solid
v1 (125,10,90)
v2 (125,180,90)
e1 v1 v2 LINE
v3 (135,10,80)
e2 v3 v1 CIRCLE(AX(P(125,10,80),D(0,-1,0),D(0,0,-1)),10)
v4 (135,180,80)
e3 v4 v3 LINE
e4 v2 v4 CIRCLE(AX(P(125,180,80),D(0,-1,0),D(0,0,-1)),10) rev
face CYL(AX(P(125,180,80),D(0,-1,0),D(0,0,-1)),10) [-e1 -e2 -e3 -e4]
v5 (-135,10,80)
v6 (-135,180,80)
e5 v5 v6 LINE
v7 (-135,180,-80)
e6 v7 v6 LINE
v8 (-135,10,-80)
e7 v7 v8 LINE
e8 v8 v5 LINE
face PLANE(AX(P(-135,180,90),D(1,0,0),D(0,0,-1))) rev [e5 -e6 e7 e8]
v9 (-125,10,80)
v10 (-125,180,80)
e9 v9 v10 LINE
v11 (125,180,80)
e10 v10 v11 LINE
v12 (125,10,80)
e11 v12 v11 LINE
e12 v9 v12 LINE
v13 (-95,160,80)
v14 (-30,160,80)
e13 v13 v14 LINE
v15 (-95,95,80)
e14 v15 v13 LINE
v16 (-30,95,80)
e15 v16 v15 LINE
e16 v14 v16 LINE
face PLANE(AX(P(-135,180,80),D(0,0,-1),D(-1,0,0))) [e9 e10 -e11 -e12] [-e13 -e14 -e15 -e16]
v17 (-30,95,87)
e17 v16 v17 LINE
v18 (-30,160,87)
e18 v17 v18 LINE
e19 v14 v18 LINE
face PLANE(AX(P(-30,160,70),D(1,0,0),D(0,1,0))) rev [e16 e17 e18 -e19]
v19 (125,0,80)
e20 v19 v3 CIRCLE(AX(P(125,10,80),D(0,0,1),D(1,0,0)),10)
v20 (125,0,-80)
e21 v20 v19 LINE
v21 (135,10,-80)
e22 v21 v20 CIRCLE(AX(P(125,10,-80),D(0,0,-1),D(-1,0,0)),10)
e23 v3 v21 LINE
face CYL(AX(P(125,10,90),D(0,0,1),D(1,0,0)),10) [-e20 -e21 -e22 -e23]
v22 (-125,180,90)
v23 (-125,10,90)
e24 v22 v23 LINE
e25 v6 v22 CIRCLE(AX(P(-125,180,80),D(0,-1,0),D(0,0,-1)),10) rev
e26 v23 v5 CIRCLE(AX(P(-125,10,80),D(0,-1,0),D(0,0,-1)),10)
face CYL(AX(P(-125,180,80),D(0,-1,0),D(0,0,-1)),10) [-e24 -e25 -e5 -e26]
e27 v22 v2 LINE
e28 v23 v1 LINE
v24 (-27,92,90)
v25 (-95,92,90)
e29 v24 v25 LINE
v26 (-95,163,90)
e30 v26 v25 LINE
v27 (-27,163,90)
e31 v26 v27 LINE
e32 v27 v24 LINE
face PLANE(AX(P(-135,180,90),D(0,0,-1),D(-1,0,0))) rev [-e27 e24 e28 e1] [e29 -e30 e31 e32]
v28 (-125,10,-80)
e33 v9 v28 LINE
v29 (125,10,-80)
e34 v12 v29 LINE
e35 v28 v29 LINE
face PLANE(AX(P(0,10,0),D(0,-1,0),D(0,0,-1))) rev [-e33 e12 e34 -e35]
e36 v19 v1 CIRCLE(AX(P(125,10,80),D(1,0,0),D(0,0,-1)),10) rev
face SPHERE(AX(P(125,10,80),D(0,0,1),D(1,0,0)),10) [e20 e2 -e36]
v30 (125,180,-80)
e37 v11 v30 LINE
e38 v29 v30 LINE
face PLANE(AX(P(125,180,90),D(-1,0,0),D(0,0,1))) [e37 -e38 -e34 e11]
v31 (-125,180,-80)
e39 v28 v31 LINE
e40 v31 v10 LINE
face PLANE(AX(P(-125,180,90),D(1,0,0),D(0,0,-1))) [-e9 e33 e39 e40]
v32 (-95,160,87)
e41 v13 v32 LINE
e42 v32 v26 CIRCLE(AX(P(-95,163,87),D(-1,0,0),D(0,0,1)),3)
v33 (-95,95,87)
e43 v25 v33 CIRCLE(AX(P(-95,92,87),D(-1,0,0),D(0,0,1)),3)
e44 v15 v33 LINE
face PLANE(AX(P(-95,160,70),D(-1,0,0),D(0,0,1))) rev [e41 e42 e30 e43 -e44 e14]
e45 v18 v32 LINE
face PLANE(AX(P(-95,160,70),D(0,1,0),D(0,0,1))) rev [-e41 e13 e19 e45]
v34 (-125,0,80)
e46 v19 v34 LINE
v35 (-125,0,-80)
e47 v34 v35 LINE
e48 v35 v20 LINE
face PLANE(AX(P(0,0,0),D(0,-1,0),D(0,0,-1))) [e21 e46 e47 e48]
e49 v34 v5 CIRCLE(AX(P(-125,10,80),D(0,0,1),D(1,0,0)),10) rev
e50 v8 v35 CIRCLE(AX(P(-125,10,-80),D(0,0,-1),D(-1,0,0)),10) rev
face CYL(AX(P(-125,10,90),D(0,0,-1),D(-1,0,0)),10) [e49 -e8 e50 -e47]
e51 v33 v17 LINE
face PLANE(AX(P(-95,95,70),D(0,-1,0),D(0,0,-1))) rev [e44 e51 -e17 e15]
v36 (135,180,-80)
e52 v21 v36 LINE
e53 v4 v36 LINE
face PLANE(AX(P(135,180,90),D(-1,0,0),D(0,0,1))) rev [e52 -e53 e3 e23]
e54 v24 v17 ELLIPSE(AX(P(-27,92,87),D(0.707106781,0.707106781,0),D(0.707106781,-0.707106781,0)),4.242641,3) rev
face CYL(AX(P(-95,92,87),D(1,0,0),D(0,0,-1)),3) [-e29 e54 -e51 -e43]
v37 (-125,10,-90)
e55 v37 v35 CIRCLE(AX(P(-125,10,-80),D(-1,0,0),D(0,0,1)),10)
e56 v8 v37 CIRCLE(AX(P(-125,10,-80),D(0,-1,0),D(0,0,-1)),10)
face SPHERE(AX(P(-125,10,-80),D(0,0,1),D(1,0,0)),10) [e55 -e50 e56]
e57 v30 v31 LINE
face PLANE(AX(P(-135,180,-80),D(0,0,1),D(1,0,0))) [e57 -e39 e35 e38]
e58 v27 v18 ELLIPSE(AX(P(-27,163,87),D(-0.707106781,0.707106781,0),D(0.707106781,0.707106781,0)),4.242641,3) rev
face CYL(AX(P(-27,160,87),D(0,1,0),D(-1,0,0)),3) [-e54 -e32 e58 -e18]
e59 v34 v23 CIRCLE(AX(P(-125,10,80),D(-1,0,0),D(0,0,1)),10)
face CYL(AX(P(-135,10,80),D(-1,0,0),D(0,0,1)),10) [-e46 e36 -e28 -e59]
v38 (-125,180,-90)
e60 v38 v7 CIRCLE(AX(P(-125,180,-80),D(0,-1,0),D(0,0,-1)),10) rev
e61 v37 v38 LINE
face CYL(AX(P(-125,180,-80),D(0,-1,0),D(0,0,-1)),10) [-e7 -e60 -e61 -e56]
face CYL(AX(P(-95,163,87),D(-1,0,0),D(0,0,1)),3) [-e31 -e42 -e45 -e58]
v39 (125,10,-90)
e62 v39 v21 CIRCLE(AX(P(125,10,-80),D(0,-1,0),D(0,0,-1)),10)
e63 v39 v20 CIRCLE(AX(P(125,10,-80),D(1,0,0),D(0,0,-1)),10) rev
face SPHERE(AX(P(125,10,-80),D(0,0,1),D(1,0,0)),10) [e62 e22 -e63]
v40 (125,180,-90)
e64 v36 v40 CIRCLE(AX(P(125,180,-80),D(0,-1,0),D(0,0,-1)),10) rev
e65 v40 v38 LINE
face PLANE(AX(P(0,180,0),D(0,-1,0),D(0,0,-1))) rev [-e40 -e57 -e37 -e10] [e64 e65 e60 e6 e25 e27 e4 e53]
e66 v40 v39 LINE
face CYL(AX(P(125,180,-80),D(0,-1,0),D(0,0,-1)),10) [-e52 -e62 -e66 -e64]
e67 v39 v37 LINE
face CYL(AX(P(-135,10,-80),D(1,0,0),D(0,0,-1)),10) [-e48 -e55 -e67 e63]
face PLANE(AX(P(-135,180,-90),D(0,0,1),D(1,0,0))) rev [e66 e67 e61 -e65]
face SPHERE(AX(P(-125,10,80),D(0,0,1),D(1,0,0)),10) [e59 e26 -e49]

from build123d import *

# Parameters (mm, degrees)
SKETCH1_W        = 270
SKETCH1_H        = 180
EXTRUDE1_DEPTH   = 180
FILLET1_R        = 10
SHELL1_START     = -125
SHELL1_OUTLINE_W = 170
SHELL1_OUTLINE_H = 160
SHELL1_DEPTH     = 250
SKETCH2_W        = 65
SKETCH2_H        = 65
EXTRUDE2_DEPTH   = 20
FILLET2_R        = 3


# Read off the part's stored shape, not the designer's step: Shell1
with BuildPart() as part:
    # Sketch1 → Extrude1 (new body)
    with BuildSketch(Plane(origin=(0, 0, 0), x_dir=(1, 0, 0), z_dir=(0, 1, 0))):
        Rectangle(SKETCH1_W, SKETCH1_H)
    extrude(amount=EXTRUDE1_DEPTH)

    # Fillet1
    fillet1_edges = [part.edges().sort_by_distance(p)[0] for p in [
        (0, 0, 90),
        (-135, 0, 0),
        (0, 0, -90),
        (135, 0, 0),
        (135, 90, 90),
        (-135, 90, 90),
        (-135, 90, -90),
        (135, 90, -90),
    ]]
    fillet(fillet1_edges, radius=FILLET1_R)

    # Shell1 outline → Shell1 (cut)
    with BuildSketch(Plane.YZ.offset(SHELL1_START)):
        with Locations((95, 0)):
            Rectangle(SHELL1_OUTLINE_W, SHELL1_OUTLINE_H)
    extrude(amount=SHELL1_DEPTH, mode=Mode.SUBTRACT)

    # Sketch2 → Extrude2 (cut)
    with BuildSketch(Plane.XY.offset(90)):
        with Locations((-62.5, 127.5)):
            Rectangle(SKETCH2_W, SKETCH2_H)
    extrude(amount=-EXTRUDE2_DEPTH, mode=Mode.SUBTRACT)

    # Fillet2
    fillet2_edges = [part.edges().sort_by_distance(p)[0] for p in [
        (-62.5, 95, 90),
        (-30, 127.5, 90),
        (-62.5, 160, 90),
    ]]
    fillet(fillet2_edges, radius=FILLET2_R)


solid = part.part
